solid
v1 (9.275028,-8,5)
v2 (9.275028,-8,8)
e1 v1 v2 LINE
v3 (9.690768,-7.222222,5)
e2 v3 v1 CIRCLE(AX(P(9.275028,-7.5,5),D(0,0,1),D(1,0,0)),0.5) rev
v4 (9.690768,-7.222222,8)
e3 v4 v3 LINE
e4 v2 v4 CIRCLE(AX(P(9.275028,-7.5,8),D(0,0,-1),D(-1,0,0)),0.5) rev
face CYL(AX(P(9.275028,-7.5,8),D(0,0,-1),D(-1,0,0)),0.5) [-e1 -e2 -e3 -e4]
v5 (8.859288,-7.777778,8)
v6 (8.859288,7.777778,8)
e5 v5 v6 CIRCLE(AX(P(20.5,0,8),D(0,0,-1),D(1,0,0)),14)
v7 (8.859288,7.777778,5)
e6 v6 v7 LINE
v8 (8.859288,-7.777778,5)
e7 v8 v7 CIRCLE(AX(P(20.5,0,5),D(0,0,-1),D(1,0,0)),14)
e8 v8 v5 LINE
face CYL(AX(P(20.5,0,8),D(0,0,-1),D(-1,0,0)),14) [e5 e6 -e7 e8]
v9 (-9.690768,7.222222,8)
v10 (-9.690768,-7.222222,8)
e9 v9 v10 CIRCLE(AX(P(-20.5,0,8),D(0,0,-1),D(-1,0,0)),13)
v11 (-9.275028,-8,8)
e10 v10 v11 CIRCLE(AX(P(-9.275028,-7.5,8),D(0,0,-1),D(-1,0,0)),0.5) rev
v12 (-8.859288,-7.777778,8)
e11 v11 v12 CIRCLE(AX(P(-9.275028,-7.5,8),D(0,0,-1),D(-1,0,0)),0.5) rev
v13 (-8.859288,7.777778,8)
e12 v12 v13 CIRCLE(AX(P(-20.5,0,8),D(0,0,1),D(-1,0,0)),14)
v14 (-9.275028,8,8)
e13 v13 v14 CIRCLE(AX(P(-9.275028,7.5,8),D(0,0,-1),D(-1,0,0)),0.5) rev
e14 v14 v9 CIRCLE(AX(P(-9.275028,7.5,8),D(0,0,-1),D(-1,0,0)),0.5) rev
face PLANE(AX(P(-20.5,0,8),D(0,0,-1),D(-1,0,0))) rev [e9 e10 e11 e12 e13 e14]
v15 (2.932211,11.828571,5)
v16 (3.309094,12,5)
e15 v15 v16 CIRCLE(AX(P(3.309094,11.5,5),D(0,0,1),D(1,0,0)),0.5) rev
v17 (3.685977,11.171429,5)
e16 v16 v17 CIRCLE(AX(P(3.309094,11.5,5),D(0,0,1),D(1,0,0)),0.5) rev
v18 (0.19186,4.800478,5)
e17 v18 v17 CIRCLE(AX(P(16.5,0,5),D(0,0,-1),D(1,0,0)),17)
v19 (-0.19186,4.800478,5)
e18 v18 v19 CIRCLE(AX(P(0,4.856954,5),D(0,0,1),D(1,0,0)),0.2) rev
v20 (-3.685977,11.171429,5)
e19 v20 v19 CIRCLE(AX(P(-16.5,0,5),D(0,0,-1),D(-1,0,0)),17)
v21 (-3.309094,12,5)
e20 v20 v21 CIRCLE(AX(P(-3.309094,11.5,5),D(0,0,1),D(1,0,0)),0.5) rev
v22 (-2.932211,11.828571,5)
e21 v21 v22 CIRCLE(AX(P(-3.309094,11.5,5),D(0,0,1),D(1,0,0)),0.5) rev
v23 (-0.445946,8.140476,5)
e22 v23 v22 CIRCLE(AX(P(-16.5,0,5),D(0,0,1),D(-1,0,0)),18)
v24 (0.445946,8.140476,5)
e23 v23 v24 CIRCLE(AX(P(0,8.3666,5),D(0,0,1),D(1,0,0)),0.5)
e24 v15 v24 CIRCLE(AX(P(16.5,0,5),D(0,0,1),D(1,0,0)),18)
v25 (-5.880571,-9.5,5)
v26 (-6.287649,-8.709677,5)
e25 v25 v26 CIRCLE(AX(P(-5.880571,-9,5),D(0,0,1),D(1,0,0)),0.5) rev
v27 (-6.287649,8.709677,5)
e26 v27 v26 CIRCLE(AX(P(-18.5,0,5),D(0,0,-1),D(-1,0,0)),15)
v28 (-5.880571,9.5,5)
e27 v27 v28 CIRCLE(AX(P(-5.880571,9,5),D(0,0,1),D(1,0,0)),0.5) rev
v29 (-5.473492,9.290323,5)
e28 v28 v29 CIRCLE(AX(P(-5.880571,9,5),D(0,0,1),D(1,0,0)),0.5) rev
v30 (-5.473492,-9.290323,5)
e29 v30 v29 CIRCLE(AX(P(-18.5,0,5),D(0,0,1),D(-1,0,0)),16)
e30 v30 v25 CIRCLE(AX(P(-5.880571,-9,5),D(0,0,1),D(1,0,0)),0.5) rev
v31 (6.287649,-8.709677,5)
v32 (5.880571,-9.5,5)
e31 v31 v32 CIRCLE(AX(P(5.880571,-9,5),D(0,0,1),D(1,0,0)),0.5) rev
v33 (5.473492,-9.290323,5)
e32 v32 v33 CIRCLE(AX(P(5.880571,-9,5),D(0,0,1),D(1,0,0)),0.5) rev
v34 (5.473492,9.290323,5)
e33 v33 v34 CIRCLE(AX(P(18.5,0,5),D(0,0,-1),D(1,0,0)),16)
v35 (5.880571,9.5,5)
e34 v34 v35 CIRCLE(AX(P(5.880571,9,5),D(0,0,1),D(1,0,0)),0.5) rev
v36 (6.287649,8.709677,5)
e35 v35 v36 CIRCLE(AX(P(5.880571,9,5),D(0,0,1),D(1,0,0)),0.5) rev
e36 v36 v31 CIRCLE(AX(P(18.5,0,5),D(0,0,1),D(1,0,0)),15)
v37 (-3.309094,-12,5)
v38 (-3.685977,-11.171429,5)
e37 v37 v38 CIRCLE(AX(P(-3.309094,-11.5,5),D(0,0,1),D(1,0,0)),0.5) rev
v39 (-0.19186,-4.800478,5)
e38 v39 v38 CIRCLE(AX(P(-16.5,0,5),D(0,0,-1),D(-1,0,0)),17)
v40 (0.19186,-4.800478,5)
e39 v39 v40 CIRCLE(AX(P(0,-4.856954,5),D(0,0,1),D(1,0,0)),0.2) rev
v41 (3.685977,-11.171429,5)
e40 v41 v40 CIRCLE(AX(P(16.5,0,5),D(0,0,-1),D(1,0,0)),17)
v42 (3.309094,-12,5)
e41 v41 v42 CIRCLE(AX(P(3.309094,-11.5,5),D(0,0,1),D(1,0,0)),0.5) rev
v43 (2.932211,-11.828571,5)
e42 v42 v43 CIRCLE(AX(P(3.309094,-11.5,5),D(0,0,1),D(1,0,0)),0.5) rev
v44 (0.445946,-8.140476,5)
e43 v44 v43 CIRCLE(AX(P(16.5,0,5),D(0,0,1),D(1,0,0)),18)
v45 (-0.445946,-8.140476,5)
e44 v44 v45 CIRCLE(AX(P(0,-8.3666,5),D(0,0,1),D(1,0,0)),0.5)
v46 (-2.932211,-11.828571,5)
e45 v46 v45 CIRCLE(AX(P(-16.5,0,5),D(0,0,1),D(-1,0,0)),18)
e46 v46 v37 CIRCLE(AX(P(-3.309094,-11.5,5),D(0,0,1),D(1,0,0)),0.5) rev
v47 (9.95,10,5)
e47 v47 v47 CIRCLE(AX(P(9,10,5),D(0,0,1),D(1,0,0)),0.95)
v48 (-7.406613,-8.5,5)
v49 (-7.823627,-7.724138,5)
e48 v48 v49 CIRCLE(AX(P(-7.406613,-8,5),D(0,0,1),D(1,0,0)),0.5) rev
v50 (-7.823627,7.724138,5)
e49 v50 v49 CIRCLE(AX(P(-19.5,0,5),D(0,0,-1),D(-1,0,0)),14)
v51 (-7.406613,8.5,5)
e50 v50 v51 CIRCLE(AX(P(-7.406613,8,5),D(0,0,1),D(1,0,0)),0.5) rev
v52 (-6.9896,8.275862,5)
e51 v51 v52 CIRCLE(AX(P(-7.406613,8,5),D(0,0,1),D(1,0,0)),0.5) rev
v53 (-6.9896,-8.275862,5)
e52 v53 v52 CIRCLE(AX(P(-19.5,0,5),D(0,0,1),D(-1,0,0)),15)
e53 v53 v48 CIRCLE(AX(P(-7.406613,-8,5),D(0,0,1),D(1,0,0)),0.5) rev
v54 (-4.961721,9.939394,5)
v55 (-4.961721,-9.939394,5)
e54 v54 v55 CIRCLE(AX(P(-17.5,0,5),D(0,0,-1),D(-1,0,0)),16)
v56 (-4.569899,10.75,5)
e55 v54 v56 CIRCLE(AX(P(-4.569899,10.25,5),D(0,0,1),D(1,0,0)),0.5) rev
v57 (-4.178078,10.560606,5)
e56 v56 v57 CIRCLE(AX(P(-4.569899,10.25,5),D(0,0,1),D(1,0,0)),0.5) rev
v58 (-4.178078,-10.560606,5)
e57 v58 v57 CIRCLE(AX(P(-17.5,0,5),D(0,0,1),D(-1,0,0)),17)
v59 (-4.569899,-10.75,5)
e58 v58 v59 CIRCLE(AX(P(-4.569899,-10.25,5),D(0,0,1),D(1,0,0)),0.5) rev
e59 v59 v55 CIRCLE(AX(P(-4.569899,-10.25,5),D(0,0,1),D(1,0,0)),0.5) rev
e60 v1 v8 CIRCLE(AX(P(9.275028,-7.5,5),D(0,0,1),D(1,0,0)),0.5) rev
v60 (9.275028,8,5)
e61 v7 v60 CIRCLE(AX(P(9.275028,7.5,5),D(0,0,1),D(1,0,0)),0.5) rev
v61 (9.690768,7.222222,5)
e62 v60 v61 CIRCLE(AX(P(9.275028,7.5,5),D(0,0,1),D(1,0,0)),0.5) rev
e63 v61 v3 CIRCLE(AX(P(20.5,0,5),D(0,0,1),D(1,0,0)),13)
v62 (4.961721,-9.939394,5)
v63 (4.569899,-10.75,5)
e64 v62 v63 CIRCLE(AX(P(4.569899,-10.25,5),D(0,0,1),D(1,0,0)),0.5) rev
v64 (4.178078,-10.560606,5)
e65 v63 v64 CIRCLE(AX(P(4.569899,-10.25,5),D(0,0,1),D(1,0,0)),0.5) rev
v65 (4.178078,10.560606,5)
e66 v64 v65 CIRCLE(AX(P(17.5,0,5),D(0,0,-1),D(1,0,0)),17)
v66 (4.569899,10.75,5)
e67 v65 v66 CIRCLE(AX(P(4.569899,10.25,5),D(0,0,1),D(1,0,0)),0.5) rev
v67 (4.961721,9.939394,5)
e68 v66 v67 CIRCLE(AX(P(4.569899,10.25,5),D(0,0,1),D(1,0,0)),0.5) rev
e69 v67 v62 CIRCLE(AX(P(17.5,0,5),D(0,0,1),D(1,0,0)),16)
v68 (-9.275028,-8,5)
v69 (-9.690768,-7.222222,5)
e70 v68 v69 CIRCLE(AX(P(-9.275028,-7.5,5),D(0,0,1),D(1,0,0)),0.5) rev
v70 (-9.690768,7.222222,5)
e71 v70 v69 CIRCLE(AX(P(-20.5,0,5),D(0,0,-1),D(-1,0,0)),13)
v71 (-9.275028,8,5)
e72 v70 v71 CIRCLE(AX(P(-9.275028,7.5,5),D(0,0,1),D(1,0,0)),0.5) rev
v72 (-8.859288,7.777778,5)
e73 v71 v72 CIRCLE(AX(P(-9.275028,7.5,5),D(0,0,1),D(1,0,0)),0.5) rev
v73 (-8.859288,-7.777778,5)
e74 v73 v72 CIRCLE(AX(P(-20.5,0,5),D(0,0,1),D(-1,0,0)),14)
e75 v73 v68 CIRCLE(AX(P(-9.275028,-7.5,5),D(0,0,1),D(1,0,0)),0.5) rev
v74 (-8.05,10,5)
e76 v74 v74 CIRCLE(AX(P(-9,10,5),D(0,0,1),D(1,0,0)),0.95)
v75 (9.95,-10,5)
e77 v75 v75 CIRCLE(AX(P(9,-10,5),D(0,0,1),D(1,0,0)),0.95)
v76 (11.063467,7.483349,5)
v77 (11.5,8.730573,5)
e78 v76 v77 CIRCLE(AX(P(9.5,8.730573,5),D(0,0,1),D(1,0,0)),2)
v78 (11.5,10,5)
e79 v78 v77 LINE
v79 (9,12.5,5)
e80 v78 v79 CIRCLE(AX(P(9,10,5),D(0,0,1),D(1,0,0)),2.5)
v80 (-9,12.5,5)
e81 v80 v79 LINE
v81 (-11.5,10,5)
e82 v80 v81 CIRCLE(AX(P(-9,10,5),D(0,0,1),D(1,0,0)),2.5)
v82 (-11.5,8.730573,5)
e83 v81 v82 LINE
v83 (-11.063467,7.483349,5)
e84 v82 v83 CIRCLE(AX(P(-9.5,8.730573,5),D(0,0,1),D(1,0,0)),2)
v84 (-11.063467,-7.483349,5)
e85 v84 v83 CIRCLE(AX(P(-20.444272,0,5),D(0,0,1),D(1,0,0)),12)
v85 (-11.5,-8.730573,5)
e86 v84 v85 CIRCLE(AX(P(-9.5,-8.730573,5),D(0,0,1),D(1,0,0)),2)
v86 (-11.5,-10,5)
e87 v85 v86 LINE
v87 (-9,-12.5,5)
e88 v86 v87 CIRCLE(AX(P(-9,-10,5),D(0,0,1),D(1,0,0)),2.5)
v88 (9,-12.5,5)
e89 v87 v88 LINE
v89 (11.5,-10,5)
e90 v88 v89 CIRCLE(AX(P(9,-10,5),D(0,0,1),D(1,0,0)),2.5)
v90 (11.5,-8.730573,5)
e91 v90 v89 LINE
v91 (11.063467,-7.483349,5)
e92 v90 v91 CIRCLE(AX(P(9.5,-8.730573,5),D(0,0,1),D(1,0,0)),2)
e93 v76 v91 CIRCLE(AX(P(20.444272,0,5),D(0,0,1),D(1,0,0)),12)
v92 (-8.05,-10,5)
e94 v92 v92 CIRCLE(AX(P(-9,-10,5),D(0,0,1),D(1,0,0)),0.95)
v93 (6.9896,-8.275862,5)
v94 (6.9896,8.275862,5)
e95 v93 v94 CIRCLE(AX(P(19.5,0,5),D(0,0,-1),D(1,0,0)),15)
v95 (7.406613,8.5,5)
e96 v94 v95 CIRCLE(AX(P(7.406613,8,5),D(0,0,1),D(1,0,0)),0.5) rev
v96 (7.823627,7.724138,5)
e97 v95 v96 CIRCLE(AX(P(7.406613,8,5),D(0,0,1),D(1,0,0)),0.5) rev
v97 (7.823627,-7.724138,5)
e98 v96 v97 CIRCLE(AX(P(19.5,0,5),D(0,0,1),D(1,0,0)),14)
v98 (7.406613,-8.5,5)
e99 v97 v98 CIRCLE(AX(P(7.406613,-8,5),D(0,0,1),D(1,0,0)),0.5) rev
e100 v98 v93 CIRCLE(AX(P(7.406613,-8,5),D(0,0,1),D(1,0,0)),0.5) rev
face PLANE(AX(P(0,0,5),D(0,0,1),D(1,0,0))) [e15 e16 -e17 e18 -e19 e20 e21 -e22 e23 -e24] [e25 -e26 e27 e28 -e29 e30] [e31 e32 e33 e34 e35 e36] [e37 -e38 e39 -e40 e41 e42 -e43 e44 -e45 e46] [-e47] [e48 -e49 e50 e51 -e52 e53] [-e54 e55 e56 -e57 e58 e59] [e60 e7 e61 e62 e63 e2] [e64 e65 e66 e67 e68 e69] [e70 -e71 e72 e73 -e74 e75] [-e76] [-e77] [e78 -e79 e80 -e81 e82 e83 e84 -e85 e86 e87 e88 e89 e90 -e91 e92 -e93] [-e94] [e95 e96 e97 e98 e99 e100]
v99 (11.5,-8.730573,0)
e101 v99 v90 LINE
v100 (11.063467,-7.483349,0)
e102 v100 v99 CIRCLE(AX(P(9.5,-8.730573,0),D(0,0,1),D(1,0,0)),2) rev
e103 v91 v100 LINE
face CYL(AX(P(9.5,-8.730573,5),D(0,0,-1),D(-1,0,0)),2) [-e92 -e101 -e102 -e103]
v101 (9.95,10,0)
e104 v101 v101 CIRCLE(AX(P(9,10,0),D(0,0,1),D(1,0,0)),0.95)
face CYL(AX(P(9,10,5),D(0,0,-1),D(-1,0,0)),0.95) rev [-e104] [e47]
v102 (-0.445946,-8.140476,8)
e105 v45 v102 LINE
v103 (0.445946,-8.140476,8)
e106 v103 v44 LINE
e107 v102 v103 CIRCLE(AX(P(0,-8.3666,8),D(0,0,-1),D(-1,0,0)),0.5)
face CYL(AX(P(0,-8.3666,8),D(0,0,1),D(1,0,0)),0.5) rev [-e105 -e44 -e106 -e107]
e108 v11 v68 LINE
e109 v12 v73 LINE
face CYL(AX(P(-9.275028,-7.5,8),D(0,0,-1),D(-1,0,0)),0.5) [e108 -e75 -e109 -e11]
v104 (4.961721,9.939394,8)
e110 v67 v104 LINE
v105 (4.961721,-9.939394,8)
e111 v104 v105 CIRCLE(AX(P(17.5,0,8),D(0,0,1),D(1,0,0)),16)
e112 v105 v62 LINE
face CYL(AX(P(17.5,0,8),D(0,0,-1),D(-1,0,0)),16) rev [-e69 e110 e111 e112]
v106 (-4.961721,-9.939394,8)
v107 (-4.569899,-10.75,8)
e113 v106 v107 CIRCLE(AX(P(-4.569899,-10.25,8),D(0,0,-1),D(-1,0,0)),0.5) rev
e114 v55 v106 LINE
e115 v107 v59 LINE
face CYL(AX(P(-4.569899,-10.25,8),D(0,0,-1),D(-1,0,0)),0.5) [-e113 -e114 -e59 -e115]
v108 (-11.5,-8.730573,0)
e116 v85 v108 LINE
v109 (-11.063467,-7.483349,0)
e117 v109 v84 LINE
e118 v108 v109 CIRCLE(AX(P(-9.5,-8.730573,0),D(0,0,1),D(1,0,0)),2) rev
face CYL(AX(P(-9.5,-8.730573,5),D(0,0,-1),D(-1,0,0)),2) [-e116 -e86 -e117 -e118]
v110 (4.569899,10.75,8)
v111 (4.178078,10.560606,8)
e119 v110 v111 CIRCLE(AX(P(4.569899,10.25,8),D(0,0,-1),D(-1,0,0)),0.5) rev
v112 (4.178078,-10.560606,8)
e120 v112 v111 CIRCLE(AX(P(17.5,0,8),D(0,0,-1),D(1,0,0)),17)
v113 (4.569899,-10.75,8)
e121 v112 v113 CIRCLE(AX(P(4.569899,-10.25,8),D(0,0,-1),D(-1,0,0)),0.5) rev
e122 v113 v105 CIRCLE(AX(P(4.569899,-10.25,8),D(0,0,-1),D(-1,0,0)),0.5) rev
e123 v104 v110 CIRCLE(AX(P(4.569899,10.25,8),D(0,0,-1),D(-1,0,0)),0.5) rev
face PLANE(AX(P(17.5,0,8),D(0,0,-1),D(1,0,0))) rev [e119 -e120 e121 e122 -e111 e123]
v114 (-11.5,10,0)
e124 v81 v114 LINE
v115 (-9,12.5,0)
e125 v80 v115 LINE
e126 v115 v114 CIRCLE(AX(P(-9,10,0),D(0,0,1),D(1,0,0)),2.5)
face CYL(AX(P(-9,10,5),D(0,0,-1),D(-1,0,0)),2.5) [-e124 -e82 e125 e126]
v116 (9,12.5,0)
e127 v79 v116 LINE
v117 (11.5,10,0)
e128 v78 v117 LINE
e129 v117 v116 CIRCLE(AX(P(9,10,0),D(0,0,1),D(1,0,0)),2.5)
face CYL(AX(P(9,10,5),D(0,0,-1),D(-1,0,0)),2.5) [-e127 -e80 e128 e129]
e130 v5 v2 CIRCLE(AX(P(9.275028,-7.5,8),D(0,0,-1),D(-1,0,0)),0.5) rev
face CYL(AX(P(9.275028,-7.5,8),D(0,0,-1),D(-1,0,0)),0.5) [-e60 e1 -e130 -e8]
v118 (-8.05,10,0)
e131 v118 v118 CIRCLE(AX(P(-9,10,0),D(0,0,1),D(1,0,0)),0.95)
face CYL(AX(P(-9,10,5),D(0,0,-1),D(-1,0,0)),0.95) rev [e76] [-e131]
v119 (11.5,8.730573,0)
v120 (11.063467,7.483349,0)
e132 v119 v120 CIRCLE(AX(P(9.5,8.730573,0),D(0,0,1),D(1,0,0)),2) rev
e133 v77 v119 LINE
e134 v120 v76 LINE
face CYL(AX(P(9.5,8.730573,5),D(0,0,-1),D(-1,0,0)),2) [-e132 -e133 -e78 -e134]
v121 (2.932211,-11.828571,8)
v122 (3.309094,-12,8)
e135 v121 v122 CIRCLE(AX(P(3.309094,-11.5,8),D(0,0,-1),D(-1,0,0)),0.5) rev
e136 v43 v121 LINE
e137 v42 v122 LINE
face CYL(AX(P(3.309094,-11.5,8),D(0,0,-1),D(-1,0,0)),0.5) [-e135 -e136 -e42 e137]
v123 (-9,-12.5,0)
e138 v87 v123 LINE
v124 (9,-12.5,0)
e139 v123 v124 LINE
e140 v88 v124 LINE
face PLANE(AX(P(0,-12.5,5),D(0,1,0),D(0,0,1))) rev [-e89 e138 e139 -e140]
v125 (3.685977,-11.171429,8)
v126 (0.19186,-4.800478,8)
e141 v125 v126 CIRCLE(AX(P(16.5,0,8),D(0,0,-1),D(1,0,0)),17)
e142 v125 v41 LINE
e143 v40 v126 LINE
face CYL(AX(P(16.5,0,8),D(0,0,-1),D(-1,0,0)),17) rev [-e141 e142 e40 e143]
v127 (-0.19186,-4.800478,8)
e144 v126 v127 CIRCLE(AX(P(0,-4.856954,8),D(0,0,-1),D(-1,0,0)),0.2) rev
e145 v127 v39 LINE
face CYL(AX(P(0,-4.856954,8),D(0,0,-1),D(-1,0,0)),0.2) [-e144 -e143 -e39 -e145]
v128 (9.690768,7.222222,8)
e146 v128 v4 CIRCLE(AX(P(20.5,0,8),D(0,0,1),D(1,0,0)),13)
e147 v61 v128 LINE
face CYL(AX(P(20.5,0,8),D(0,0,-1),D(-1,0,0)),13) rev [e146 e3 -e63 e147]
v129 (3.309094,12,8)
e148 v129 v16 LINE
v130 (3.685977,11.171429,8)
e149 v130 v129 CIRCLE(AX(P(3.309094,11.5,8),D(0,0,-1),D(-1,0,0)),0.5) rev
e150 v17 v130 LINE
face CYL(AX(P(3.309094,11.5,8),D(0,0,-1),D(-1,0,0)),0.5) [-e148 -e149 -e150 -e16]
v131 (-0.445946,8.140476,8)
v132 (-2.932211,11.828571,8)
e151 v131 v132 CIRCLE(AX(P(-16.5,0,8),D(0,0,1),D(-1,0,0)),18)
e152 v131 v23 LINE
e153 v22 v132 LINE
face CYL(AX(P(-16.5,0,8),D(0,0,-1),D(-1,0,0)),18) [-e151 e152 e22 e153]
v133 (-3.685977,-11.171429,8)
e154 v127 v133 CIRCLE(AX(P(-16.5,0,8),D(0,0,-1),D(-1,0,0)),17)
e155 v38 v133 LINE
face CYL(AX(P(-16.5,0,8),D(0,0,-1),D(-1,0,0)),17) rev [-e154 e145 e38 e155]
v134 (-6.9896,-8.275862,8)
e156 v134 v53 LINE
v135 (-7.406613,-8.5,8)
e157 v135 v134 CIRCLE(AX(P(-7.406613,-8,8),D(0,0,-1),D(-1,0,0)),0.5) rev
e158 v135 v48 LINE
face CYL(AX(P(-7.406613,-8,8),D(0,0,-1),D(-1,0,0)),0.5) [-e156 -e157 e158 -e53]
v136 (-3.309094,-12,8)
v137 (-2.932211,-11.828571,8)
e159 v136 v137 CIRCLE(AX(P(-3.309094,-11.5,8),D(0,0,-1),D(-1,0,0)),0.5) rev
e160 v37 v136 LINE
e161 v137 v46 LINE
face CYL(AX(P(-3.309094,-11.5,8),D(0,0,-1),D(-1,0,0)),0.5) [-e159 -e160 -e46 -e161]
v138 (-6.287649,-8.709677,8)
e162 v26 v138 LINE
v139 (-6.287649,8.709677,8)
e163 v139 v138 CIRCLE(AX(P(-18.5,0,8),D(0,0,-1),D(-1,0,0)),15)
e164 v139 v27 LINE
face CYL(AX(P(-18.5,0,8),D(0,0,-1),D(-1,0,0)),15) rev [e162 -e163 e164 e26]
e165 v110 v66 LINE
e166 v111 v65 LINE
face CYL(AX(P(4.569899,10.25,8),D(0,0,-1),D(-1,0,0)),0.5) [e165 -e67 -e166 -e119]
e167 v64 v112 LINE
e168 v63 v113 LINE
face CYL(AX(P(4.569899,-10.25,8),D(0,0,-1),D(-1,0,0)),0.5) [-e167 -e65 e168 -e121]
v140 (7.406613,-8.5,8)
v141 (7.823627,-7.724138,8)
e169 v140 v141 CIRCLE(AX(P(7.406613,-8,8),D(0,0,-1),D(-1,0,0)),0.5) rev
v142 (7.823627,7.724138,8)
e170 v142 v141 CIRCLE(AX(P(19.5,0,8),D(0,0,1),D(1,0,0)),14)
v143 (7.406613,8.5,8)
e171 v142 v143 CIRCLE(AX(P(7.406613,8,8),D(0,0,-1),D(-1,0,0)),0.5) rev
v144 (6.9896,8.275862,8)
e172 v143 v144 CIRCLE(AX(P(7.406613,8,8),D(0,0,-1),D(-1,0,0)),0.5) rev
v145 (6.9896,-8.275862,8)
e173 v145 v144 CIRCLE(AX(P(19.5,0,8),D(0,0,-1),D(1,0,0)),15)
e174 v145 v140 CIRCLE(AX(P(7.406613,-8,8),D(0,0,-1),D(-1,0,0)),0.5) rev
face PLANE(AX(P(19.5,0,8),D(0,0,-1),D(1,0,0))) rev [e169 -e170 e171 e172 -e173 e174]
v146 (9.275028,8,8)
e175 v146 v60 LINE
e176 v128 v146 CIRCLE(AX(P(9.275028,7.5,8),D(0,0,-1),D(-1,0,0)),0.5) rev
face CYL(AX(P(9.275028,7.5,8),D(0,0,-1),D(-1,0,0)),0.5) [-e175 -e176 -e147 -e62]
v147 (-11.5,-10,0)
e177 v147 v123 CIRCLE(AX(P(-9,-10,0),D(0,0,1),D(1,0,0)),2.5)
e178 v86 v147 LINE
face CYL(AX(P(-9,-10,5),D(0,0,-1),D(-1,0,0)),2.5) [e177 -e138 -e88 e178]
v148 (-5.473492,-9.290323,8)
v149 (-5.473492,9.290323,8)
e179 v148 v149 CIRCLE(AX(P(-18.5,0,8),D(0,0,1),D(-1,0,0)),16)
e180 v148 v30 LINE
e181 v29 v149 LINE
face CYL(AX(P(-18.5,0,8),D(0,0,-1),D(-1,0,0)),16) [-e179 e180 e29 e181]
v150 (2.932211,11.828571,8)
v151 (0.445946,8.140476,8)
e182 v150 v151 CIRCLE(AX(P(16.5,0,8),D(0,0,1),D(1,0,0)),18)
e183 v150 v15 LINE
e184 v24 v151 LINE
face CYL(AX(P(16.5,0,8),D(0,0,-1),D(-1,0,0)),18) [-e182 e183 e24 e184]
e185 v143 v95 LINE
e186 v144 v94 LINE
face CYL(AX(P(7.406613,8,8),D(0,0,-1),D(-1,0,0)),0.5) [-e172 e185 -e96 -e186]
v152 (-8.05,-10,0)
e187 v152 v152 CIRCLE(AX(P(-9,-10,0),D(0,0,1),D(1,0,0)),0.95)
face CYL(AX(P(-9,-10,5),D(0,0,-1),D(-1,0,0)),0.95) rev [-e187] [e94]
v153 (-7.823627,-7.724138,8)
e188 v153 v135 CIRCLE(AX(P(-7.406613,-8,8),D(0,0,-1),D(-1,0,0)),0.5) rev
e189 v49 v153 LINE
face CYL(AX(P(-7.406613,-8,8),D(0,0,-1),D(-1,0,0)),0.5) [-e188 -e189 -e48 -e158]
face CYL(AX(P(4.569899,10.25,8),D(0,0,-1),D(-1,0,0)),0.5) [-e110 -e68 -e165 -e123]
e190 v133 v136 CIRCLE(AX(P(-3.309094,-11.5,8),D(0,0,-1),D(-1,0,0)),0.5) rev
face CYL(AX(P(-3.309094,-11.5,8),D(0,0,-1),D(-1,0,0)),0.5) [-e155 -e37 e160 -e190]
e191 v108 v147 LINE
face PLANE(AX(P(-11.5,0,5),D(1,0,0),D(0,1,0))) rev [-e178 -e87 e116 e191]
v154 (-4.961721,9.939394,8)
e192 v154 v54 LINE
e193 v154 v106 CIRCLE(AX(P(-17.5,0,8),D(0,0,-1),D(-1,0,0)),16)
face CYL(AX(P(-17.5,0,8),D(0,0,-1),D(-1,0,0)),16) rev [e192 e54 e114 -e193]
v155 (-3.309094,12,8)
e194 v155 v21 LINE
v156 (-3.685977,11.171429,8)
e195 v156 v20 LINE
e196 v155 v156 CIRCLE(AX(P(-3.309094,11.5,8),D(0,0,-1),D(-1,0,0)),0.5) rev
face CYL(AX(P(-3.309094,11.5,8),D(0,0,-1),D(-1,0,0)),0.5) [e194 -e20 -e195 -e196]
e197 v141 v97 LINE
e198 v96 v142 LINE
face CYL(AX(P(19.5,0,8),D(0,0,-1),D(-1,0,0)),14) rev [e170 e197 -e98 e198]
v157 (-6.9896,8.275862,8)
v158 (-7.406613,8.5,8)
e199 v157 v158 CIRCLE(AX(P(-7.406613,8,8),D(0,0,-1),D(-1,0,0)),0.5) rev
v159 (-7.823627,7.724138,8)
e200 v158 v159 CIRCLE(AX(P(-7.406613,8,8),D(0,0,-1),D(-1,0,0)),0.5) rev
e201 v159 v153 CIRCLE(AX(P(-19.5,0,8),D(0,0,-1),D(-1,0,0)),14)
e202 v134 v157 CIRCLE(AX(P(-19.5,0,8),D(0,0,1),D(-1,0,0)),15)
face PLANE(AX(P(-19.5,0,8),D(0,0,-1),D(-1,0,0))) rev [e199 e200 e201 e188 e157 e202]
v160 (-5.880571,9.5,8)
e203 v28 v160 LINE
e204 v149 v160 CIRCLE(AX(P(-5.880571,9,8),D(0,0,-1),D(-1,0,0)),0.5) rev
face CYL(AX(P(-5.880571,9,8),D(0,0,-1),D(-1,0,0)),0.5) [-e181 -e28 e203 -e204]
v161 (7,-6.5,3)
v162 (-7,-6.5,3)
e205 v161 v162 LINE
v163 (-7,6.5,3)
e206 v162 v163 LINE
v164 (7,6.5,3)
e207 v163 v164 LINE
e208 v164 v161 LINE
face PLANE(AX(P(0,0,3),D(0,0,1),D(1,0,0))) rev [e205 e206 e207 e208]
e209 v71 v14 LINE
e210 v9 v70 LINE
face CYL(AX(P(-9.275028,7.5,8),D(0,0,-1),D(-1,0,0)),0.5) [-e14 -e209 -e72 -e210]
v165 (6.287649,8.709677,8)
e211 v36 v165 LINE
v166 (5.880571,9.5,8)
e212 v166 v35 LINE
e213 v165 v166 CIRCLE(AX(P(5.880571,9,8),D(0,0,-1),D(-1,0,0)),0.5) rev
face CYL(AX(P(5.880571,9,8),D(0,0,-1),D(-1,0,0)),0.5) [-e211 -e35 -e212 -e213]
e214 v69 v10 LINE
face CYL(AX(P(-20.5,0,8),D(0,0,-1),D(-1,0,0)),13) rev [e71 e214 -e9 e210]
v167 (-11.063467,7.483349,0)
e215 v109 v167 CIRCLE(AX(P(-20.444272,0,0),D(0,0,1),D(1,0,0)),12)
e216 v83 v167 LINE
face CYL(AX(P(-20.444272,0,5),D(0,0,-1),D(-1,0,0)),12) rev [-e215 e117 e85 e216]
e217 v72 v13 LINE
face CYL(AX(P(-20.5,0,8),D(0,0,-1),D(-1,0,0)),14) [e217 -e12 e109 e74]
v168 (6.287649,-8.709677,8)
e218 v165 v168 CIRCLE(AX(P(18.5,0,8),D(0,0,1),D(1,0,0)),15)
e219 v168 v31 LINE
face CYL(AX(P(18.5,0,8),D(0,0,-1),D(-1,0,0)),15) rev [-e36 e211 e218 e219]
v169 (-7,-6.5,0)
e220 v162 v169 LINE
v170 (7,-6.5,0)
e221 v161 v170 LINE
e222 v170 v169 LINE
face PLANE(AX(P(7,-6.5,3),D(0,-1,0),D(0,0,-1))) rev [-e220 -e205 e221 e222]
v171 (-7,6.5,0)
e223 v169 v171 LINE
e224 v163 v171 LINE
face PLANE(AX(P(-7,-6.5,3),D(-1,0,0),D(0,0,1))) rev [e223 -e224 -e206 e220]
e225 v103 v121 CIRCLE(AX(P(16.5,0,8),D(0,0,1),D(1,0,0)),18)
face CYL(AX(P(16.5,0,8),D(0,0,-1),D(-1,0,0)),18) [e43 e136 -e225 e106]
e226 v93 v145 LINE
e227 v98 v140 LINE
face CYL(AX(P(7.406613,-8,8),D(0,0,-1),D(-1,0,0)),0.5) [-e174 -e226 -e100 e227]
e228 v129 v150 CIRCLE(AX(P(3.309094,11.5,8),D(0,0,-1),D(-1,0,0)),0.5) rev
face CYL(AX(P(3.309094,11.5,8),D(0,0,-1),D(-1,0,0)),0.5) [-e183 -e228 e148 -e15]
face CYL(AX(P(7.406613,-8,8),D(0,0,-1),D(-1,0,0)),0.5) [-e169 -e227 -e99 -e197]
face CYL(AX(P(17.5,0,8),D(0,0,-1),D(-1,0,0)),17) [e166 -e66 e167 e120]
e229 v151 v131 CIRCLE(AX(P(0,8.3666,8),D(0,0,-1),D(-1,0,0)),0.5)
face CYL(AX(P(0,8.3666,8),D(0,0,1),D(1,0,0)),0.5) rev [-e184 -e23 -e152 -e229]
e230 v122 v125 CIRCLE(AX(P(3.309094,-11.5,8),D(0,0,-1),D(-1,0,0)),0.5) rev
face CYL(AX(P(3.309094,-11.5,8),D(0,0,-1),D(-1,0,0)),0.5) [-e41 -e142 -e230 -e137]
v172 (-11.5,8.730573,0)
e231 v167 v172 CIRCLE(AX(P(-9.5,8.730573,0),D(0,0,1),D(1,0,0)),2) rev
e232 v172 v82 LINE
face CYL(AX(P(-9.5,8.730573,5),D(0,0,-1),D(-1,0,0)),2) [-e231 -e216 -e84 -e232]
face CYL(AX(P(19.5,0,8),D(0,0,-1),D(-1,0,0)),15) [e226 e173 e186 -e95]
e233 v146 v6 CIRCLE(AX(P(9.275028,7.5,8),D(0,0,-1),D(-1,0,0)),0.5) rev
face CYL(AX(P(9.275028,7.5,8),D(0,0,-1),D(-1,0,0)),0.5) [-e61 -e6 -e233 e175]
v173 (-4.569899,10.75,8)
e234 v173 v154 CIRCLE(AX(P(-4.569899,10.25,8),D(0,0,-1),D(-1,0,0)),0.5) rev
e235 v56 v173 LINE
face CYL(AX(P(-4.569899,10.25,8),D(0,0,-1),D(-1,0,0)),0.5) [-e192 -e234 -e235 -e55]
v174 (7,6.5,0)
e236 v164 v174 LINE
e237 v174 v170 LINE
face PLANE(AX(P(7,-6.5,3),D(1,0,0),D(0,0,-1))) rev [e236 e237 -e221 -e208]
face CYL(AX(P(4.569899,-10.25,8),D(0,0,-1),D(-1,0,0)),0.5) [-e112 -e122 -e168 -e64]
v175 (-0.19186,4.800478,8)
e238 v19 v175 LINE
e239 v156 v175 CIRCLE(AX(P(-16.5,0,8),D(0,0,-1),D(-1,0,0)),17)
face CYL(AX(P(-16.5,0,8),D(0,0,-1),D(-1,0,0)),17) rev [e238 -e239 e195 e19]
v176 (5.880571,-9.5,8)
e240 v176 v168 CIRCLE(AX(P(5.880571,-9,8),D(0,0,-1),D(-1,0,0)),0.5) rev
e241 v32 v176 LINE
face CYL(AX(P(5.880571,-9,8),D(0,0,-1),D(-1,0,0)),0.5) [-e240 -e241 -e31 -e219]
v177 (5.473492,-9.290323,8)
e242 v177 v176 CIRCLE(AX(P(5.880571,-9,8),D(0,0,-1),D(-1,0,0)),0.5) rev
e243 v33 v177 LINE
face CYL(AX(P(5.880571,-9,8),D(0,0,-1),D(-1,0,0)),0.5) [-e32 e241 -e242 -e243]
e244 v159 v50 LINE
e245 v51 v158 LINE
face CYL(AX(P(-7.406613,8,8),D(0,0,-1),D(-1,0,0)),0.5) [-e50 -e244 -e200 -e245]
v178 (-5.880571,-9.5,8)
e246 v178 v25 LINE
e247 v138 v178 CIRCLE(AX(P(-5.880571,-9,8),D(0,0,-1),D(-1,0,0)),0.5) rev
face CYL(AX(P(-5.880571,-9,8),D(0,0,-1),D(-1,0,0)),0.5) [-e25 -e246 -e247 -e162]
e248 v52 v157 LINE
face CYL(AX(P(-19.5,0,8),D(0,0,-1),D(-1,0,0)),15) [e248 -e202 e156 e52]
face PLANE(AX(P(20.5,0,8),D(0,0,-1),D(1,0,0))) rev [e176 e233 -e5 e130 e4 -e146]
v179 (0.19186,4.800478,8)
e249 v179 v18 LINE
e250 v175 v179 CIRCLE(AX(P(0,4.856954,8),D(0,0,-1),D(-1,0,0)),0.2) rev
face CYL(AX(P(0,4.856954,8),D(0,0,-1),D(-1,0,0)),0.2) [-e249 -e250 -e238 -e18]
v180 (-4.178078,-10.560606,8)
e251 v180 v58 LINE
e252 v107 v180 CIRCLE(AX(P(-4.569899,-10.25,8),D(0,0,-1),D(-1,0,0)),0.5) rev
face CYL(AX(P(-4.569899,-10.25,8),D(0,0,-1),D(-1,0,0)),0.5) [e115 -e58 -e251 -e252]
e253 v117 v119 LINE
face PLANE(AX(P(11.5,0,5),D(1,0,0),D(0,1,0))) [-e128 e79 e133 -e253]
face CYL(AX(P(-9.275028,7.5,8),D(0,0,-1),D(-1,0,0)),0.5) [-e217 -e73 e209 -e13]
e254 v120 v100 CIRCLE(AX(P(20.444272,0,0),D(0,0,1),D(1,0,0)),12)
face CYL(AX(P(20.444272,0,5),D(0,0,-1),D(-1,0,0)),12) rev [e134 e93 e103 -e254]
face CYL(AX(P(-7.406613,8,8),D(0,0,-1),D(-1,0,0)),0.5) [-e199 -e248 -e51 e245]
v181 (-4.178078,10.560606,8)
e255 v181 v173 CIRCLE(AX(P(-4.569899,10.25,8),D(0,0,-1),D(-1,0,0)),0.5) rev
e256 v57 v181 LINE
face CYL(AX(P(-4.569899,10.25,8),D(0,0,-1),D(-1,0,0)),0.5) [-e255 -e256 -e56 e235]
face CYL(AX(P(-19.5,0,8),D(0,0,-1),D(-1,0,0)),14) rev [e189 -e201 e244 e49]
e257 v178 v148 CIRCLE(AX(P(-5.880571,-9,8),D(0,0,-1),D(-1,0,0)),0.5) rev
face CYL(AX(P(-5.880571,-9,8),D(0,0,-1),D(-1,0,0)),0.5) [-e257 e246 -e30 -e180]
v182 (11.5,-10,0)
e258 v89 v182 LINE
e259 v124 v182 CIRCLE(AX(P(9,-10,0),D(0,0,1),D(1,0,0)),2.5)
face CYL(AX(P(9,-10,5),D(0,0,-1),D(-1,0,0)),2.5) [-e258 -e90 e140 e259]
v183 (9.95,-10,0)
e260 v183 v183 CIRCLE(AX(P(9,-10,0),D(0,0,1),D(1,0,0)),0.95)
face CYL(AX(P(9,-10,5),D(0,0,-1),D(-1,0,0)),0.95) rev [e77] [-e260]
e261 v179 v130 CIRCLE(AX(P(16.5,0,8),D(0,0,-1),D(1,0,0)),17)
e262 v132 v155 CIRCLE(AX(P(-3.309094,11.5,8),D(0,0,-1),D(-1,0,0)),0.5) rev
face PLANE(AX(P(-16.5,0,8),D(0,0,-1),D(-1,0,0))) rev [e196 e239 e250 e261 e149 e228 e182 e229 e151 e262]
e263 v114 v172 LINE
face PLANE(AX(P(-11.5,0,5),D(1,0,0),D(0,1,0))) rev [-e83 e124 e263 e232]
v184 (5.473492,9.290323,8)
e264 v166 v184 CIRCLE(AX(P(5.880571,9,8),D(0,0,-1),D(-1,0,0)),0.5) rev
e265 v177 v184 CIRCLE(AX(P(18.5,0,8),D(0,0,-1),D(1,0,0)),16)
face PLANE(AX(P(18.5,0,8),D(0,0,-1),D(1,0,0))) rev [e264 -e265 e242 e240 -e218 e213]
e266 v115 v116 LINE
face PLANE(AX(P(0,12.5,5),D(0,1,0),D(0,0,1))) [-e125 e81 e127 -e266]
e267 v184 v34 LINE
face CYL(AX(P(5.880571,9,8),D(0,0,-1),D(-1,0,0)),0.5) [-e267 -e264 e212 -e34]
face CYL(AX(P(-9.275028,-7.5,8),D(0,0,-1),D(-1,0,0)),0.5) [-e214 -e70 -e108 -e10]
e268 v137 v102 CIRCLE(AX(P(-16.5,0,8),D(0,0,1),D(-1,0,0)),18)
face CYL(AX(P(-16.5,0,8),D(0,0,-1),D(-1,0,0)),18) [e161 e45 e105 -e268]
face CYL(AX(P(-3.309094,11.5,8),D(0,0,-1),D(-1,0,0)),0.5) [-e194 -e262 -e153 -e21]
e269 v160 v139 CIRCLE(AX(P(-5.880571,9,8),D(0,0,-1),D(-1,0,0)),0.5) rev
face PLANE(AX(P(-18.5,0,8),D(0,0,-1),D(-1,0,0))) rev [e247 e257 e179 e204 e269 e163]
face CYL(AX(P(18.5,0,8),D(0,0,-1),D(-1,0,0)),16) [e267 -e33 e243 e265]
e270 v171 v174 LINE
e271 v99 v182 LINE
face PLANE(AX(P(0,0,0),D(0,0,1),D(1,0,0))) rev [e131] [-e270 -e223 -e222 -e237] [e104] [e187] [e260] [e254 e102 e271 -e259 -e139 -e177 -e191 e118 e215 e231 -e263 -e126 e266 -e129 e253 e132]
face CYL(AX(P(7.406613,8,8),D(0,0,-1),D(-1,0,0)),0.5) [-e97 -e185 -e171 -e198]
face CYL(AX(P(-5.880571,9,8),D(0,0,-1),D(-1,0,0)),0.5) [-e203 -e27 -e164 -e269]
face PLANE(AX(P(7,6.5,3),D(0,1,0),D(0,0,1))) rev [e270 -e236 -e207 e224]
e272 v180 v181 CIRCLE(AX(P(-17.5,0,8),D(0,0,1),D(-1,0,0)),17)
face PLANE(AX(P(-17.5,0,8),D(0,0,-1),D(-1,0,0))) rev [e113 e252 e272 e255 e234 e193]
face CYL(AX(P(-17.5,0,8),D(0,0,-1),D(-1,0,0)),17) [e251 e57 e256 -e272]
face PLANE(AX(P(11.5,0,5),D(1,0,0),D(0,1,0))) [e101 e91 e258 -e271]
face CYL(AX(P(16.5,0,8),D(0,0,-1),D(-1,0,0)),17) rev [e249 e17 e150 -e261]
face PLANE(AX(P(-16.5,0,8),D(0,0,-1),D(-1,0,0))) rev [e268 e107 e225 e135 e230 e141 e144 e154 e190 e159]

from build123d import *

# Parameters (mm, degrees)
ESQUISSE1_R             = 0.95
BOSS_EXTRU_1_DEPTH      = 5
ESQUISSE2_W             = 14
ESQUISSE2_H             = 13
ENL_V_MAT_EXTRU_1_DEPTH = 3
BOSS_EXTRU_3_DEPTH      = 3
CONG_4_R                = 0.5
CONG_5_R                = 0.2
SYM_TRIE2_START         = 5
SYM_TRIE2_DEPTH         = 3
CONG_6_R                = 2


# Read off the part's stored shape, not the designer's step: Symétrie2
with BuildPart() as part:
    # Esquisse1 → Boss.-Extru.1 (new body)
    with BuildSketch(Plane.XY):
        with BuildLine():
            Line((-11.5, -8), (-11.5, -10))
            ThreePointArc((-11.5, -10), (-10.767766953, -11.767766953), (-9, -12.5))
            Line((-9, -12.5), (9, -12.5))
            ThreePointArc((9, -12.5), (10.767766953, -11.767766953), (11.5, -10))
            Line((11.5, -10), (11.5, -8))
            ThreePointArc((11.5, -8), (8.44427191, 0), (11.5, 8))
            Line((11.5, 8), (11.5, 10))
            ThreePointArc((11.5, 10), (10.767766953, 11.767766953), (9, 12.5))
            Line((9, 12.5), (-9, 12.5))
            ThreePointArc((-9, 12.5), (-10.767766953, 11.767766953), (-11.5, 10))
            Line((-11.5, 10), (-11.5, 8))
            ThreePointArc((-11.5, 8), (-8.44427191, 0), (-11.5, -8))
        make_face()
        with Locations((-9, -10)):
            Circle(ESQUISSE1_R, mode=Mode.SUBTRACT)
        with Locations((9, -10)):
            Circle(ESQUISSE1_R, mode=Mode.SUBTRACT)
        with Locations((-9, 10)):
            Circle(ESQUISSE1_R, mode=Mode.SUBTRACT)
        with Locations((9, 10)):
            Circle(ESQUISSE1_R, mode=Mode.SUBTRACT)
    extrude(amount=BOSS_EXTRU_1_DEPTH)

    # Esquisse2 → Enlèv. mat.-Extru.1 (cut)
    with BuildSketch(Plane(origin=(0, 0, 0), x_dir=(-1, 0, 0), z_dir=(0, 0, -1))):
        Rectangle(ESQUISSE2_W, ESQUISSE2_H)
    extrude(amount=-ENL_V_MAT_EXTRU_1_DEPTH, mode=Mode.SUBTRACT)

    # Esquisse5 → Boss.-Extru.3 (add)
    with BuildSketch(Plane.XY.offset(5)):
        with BuildLine():
            Line((-10.253049234, 8), (-9.010874707, 8))
            ThreePointArc((-9.010874707, 8), (-6.5, 0), (-9.010874707, -8))
            Line((-9.010874707, -8), (-10.253049234, -8))
            ThreePointArc((-10.253049234, -8), (-7.5, 0), (-10.253049234, 8))
        make_face()
        with BuildLine():
            Line((-8.375702269, -8.5), (-7.140792906, -8.5))
            ThreePointArc((-7.140792906, -8.5), (-4.5, 0), (-7.140792906, 8.5))
            Line((-7.140792906, 8.5), (-8.375702269, 8.5))
            ThreePointArc((-8.375702269, 8.5), (-5.5, 0), (-8.375702269, -8.5))
        make_face()
        with BuildLine():
            Line((-6.891813234, 9.5), (-5.62560681, 9.5))
            ThreePointArc((-5.62560681, 9.5), (-2.5, 0), (-5.62560681, -9.5))
            Line((-5.62560681, -9.5), (-6.891813234, -9.5))
            ThreePointArc((-6.891813234, -9.5), (-3.5, 0), (-6.891813234, 9.5))
        make_face()
        with BuildLine():
            Line((-5.649367106, 10.75), (-4.330432809, 10.75))
            ThreePointArc((-4.330432809, 10.75), (-0.5, 0), (-4.330432809, -10.75))
            Line((-4.330432809, -10.75), (-5.649367106, -10.75))
            ThreePointArc((-5.649367106, -10.75), (-1.5, 0), (-5.649367106, 10.75))
        make_face()
        with BuildLine():
            Line((-4.458405421, 12), (-3.083592135, 12))
            ThreePointArc((-3.083592135, 12), (-1.34998742, 9.719934096), (0, 7.193747285))
            ThreePointArc((0, 7.193747285), (1.34998742, 9.719934096), (3.083592135, 12))
            Line((3.083592135, 12), (4.458405421, 12))
            ThreePointArc((4.458405421, 12), (1.691654483, 8.349425312), (0, 4.092676386))
            ThreePointArc((0, 4.092676386), (-1.691654483, 8.349425312), (-4.458405421, 12))
        make_face()
        with BuildLine():
            Line((-4.458405421, -12), (-3.083592135, -12))
            ThreePointArc((-3.083592135, -12), (-1.34998742, -9.719934096), (0, -7.193747285))
            ThreePointArc((0, -7.193747285), (1.34998742, -9.719934096), (3.083592135, -12))
            Line((3.083592135, -12), (4.458405421, -12))
            ThreePointArc((4.458405421, -12), (1.691654483, -8.349425312), (0, -4.092676386))
            ThreePointArc((0, -4.092676386), (-1.691654483, -8.349425312), (-4.458405421, -12))
        make_face()
    extrude(amount=BOSS_EXTRU_3_DEPTH)

    # Congé4
    cong_4_edges = [part.edges().sort_by_distance(p)[0] for p in [
        (4.458405421, 12, 6.5),
        (3.083592135, 12, 6.5),
        (0, 7.193747285, 6.5),
        (-3.083592135, 12, 6.5),
        (-4.458405421, 12, 6.5),
        (-4.330432809, 10.75, 6.5),
        (-5.649367106, 10.75, 6.5),
        (-5.62560681, 9.5, 6.5),
        (-6.891813234, 9.5, 6.5),
        (-7.140792906, 8.5, 6.5),
        (-8.375702269, 8.5, 6.5),
        (-9.010874707, 8, 6.5),
        (-10.253049234, 8, 6.5),
        (0, -7.193747285, 6.5),
        (4.458405421, -12, 6.5),
        (3.083592135, -12, 6.5),
        (-3.083592135, -12, 6.5),
        (-4.458405421, -12, 6.5),
        (-4.330432809, -10.75, 6.5),
        (-5.649367106, -10.75, 6.5),
        (-5.62560681, -9.5, 6.5),
        (-6.891813234, -9.5, 6.5),
        (-7.140792906, -8.5, 6.5),
        (-8.375702269, -8.5, 6.5),
        (-9.010874707, -8, 6.5),
        (-10.253049234, -8, 6.5),
    ]]
    fillet(cong_4_edges, radius=CONG_4_R - 0.0001)  # a hair under: the kernel refuses the full size

    # Congé5
    cong_5_edges = [part.edges().sort_by_distance(p)[0] for p in [
        (0, 4.092676386, 6.5),
        (0, -4.092676386, 6.5),
    ]]
    fillet(cong_5_edges, radius=CONG_5_R)

    # Symétrie2 outline → Symétrie2 (add)
    with BuildSketch(Plane.XY.offset(SYM_TRIE2_START)):
        with BuildLine():
            ThreePointArc((9.27502784, -8), (9.715986392, -7.73570226), (9.690767549, -7.222222222))
            ThreePointArc((9.690767549, -7.222222222), (7.5, 0), (9.690767549, 7.222222222))
            ThreePointArc((9.690767549, 7.222222222), (9.715986392, 7.73570226), (9.27502784, 8))
            ThreePointArc((9.27502784, 8), (9.039325579, 7.940958552), (8.85928813, 7.777777778))
            ThreePointArc((8.85928813, 7.777777778), (6.5, 0), (8.85928813, -7.777777778))
            ThreePointArc((8.85928813, -7.777777778), (9.039325579, -7.940958552), (9.27502784, -8))
        make_face()
        with BuildLine():
            ThreePointArc((7.406613378, -8.5), (7.847028542, -8.236716038), (7.823626709, -7.724137931))
            ThreePointArc((7.823626709, -7.724137931), (5.5, 0), (7.823626709, 7.724137931))
            ThreePointArc((7.823626709, 7.724137931), (7.847028542, 8.236716038), (7.406613378, 8.5))
            ThreePointArc((7.406613378, 8.5), (7.169897339, 8.440415165), (6.989600046, 8.275862069))
            ThreePointArc((6.989600046, 8.275862069), (4.5, 0), (6.989600046, -8.275862069))
            ThreePointArc((6.989600046, -8.275862069), (7.169897339, -8.440415165), (7.406613378, -8.5))
        make_face()
        with BuildLine():
            ThreePointArc((5.880570536, -9.5), (6.32507098, -9.228952735), (6.287648906, -8.709677419))
            ThreePointArc((6.287648906, -8.709677419), (3.5, 0), (6.287648906, 8.709677419))
            ThreePointArc((6.287648906, 8.709677419), (6.32507098, 9.228952735), (5.880570536, 9.5))
            ThreePointArc((5.880570536, 9.5), (5.651617801, 9.444500445), (5.473492166, 9.290322581))
            ThreePointArc((5.473492166, 9.290322581), (2.5, 0), (5.473492166, -9.290322581))
            ThreePointArc((5.473492166, -9.290322581), (5.651617801, -9.444500445), (5.880570536, -9.5))
        make_face()
        with BuildLine():
            ThreePointArc((4.569899459, -10.75), (5.020067778, -10.46759707), (4.961720688, -9.939393939))
            ThreePointArc((4.961720688, -9.939393939), (1.5, 0), (4.961720688, 9.939393939))
            ThreePointArc((4.961720688, 9.939393939), (5.020067778, 10.46759707), (4.569899459, 10.75))
            ThreePointArc((4.569899459, 10.75), (4.352302389, 10.700168319), (4.17807823, 10.560606061))
            ThreePointArc((4.17807823, 10.560606061), (0.5, 0), (4.17807823, -10.560606061))
            ThreePointArc((4.17807823, -10.560606061), (4.352302389, -10.700168319), (4.569899459, -10.75))
        make_face()
    extrude(amount=SYM_TRIE2_DEPTH)

    # Congé6
    cong_6_edges = [part.edges().sort_by_distance(p)[0] for p in [
        (11.5, 8, 2.5),
        (11.5, -8, 2.5),
        (-11.5, -8, 2.5),
        (-11.5, 8, 2.5),
    ]]
    fillet(cong_6_edges, radius=CONG_6_R)


solid = part.part
